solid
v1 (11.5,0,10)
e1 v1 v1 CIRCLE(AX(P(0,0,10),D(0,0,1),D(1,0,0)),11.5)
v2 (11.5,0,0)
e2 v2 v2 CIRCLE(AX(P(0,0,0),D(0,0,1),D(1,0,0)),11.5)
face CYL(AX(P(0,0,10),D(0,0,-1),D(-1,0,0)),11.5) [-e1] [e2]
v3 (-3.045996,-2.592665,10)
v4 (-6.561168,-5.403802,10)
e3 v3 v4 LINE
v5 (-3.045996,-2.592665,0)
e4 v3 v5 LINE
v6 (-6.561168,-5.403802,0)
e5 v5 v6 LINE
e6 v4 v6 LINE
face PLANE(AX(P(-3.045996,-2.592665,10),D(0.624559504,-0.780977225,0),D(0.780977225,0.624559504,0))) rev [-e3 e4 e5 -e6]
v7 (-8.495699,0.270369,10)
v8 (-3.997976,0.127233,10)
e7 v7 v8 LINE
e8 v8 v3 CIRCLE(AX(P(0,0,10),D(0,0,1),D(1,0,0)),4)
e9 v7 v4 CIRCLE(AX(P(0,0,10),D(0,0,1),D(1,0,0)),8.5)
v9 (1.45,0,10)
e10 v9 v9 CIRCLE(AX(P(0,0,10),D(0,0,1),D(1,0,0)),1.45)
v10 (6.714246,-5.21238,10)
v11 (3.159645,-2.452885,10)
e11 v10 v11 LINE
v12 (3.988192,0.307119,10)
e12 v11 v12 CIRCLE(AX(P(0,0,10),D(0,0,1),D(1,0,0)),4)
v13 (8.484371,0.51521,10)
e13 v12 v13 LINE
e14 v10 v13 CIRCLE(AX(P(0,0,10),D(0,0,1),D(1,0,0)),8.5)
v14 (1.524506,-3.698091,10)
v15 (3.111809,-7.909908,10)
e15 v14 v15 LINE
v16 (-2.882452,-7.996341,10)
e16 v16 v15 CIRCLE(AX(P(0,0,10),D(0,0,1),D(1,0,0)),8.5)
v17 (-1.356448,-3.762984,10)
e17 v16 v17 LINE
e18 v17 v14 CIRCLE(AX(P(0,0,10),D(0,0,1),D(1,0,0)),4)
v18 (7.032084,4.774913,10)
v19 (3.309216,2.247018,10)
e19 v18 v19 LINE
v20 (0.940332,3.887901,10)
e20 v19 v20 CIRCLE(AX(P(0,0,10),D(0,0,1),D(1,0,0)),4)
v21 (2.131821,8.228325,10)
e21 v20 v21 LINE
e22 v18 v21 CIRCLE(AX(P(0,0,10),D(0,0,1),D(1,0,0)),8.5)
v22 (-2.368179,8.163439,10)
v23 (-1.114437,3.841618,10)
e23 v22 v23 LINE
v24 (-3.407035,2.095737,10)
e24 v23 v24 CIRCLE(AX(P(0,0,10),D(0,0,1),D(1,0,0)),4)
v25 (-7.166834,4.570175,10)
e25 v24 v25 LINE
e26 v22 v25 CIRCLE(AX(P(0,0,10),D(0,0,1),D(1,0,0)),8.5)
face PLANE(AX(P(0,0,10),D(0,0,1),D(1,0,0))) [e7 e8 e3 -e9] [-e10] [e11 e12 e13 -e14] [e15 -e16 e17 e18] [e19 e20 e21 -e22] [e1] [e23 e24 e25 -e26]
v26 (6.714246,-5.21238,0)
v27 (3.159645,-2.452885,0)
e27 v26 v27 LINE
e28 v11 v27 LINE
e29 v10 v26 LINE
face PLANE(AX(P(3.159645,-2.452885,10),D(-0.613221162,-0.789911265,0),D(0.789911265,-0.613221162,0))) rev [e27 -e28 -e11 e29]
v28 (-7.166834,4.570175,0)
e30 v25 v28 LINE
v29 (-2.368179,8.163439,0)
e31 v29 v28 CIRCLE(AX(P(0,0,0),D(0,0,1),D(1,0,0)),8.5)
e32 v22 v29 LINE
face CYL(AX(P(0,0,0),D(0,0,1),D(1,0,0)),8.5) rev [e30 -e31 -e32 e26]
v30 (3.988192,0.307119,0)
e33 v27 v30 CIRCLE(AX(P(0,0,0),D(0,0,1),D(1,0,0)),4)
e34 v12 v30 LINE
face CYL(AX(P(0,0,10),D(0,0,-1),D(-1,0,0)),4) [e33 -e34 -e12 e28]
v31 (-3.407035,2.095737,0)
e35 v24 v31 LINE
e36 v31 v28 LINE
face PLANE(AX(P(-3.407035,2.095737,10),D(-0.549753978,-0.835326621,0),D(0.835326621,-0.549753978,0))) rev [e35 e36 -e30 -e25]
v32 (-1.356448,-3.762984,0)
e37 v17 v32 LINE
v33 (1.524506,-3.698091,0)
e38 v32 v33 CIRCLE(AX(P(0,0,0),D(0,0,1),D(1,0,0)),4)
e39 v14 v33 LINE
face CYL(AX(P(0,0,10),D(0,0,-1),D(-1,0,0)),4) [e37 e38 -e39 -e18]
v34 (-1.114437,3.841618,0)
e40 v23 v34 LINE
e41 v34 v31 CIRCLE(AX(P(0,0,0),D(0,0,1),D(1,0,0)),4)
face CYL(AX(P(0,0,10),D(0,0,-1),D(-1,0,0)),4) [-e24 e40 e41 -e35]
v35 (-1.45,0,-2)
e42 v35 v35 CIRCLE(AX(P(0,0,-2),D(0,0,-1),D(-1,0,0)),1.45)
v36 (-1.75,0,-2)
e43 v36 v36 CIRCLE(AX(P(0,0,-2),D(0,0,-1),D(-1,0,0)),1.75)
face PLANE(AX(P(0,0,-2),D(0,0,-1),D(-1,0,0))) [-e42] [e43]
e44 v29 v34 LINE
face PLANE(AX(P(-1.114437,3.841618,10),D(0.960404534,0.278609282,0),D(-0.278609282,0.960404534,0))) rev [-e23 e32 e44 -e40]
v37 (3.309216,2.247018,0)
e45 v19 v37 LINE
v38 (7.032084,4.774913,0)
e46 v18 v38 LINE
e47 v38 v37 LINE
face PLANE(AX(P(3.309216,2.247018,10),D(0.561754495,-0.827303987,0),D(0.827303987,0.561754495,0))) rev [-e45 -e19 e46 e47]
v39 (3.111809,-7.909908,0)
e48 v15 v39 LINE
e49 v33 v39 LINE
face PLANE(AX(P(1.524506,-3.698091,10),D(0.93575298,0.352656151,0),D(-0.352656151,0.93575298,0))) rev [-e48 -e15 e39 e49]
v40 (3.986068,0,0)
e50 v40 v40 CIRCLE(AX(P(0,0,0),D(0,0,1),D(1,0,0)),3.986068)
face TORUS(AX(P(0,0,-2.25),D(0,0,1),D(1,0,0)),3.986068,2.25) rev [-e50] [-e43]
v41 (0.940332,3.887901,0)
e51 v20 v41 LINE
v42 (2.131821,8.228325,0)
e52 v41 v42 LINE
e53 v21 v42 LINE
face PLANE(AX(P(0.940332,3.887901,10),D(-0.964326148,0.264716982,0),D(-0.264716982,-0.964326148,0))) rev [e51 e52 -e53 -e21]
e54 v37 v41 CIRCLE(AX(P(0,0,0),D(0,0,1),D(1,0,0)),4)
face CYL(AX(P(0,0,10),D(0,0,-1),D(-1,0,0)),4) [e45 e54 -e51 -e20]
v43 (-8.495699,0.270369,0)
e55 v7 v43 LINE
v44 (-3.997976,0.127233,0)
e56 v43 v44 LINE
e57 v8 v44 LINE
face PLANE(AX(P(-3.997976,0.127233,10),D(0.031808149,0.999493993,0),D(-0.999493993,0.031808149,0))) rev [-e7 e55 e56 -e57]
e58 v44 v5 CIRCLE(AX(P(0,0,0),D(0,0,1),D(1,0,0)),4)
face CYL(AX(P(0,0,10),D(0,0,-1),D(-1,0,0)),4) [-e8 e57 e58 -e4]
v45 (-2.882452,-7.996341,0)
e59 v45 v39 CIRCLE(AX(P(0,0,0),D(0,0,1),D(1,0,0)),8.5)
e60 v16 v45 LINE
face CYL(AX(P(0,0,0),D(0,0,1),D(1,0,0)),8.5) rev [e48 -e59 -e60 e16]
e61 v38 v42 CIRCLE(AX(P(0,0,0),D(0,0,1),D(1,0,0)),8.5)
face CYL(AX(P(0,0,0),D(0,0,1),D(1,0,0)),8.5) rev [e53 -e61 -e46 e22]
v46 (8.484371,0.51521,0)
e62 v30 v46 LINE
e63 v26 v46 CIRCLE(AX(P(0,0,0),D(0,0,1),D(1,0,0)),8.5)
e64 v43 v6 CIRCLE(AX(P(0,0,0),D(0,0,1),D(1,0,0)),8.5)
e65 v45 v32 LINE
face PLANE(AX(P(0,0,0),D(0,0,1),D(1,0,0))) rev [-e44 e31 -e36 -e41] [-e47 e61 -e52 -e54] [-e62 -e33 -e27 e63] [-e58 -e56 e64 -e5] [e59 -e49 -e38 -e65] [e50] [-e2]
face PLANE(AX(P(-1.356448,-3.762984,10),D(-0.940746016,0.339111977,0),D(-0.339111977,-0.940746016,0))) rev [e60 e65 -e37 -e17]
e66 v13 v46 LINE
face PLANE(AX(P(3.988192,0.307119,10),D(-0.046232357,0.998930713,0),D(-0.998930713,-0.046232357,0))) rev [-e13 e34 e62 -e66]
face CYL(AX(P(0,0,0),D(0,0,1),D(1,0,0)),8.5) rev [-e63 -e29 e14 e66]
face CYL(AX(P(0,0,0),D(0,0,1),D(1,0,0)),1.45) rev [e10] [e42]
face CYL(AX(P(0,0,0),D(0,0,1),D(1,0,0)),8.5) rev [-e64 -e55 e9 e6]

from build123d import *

# Parameters (mm, degrees)
SKETCH1_R           = 11.5
BOSS_EXTRUDE1_DEPTH = 10
SKETCH2_R           = 8.5
CUT_EXTRUDE2_DEPTH  = 10
SKETCH4_R           = 4
BOSS_EXTRUDE2_DEPTH = 10
BOSS_EXTRUDE3_START = 10
BOSS_EXTRUDE3_DEPTH = 10
CIRPATTERN1_COUNT   = 5
SKETCH7_R           = 1.45
CUT_EXTRUDE3_DEPTH  = 10
SKETCH8_R           = 1.75
BOSS_EXTRUDE4_DEPTH = 2
CUT_EXTRUDE4_START  = -2
SKETCH9_R           = 1.45
CUT_EXTRUDE4_DEPTH  = 2
FILLET1_R           = 2.25


with BuildPart() as part:
    # Sketch1 → Boss-Extrude1 (new body)
    with BuildSketch(Plane.XY):
        Circle(SKETCH1_R)
    extrude(amount=BOSS_EXTRUDE1_DEPTH)

    # Sketch2 → Cut-Extrude2 (cut)
    with BuildSketch(Plane.XY.offset(10)):
        Circle(SKETCH2_R)
    extrude(amount=-CUT_EXTRUDE2_DEPTH, mode=Mode.SUBTRACT)



with BuildPart() as body_2:
    # Sketch4 → Boss-Extrude2 (new body)
    with BuildSketch(Plane.XY):
        Circle(SKETCH4_R)
    extrude(amount=BOSS_EXTRUDE2_DEPTH)


with BuildPart() as part_1:
    add(part.part)

    add(body_2.part)  # Boss-Extrude3 merges body 2
    # Sketch6 → Boss-Extrude3 (add)
    with BuildSketch(Plane.XY.offset(BOSS_EXTRUDE3_START)):
        with BuildLine():
            Line((-1.114437127, 3.841618134), (-2.368178894, 8.163438536))
            ThreePointArc((-2.368178894, 8.163438536), (-0.122551325, 8.499116494), (2.131821106, 8.228325393))
            Line((2.131821106, 8.228325393), (0.940332104, 3.887901173))
            ThreePointArc((0.940332104, 3.887901173), (-0.090075911, 3.998985663), (-1.114437127, 3.841618134))
        make_face()
    boss_extrude3 = extrude(amount=-BOSS_EXTRUDE3_DEPTH)

    # CirPattern1: Boss-Extrude3 ×5 about axis
    cirpattern1_axis = Axis((0, 0, 0), (0, 0, 1))
    for i in range(1, CIRPATTERN1_COUNT):
        add(boss_extrude3.rotate(cirpattern1_axis, i * 360 / CIRPATTERN1_COUNT))

    # Sketch7 → Cut-Extrude3 (cut)
    with BuildSketch(Plane.XY.offset(10)):
        Circle(SKETCH7_R)
    extrude(amount=-CUT_EXTRUDE3_DEPTH, mode=Mode.SUBTRACT)

    # Sketch8 → Boss-Extrude4 (add)
    with BuildSketch(Plane(origin=(0, 0, 0), x_dir=(-1, 0, 0), z_dir=(0, 0, -1))):
        with Locations(Location((0, 0, 0), (0, 0, 180))):
            Circle(SKETCH8_R)
    extrude(amount=BOSS_EXTRUDE4_DEPTH)

    # Sketch9 → Cut-Extrude4 (cut)
    with BuildSketch(Plane(origin=(0, 0, -2), x_dir=(-1, 0, 0), z_dir=(0, 0, -1)).offset(CUT_EXTRUDE4_START)):
        with Locations(Location((0, 0, 0), (0, 0, 180))):
            Circle(SKETCH9_R)
    extrude(amount=CUT_EXTRUDE4_DEPTH, mode=Mode.SUBTRACT)

    # Fillet1
    # the kernel refuses this fillet: 2.25 mm, written as the material it adds along each edge
    with BuildSketch(Plane(origin=(0, 0, 0), x_dir=(1, 0, 0), z_dir=(0, 1, 0))) as fillet1_piece_1:
        with BuildLine():
            CenterArc((3.986067977, 2.25), FILLET1_R, 186.379370208, 83.620629792)
            Line((1.75, 2), (1.70527864, 1.995))
            ThreePointArc((1.70527864, 1.995), (1.705, 1), (1.705, 0))
            Line((1.705, 0), (1.75, -0.045))
            Line((1.75, -0.045), (3.986067977, -0.045))
            Line((3.986067977, -0.045), (3.986067977, 0))
        make_face()
    revolve(axis=Axis((0, 0, 0), (0, 0, -1)))


solid = part_1.part
